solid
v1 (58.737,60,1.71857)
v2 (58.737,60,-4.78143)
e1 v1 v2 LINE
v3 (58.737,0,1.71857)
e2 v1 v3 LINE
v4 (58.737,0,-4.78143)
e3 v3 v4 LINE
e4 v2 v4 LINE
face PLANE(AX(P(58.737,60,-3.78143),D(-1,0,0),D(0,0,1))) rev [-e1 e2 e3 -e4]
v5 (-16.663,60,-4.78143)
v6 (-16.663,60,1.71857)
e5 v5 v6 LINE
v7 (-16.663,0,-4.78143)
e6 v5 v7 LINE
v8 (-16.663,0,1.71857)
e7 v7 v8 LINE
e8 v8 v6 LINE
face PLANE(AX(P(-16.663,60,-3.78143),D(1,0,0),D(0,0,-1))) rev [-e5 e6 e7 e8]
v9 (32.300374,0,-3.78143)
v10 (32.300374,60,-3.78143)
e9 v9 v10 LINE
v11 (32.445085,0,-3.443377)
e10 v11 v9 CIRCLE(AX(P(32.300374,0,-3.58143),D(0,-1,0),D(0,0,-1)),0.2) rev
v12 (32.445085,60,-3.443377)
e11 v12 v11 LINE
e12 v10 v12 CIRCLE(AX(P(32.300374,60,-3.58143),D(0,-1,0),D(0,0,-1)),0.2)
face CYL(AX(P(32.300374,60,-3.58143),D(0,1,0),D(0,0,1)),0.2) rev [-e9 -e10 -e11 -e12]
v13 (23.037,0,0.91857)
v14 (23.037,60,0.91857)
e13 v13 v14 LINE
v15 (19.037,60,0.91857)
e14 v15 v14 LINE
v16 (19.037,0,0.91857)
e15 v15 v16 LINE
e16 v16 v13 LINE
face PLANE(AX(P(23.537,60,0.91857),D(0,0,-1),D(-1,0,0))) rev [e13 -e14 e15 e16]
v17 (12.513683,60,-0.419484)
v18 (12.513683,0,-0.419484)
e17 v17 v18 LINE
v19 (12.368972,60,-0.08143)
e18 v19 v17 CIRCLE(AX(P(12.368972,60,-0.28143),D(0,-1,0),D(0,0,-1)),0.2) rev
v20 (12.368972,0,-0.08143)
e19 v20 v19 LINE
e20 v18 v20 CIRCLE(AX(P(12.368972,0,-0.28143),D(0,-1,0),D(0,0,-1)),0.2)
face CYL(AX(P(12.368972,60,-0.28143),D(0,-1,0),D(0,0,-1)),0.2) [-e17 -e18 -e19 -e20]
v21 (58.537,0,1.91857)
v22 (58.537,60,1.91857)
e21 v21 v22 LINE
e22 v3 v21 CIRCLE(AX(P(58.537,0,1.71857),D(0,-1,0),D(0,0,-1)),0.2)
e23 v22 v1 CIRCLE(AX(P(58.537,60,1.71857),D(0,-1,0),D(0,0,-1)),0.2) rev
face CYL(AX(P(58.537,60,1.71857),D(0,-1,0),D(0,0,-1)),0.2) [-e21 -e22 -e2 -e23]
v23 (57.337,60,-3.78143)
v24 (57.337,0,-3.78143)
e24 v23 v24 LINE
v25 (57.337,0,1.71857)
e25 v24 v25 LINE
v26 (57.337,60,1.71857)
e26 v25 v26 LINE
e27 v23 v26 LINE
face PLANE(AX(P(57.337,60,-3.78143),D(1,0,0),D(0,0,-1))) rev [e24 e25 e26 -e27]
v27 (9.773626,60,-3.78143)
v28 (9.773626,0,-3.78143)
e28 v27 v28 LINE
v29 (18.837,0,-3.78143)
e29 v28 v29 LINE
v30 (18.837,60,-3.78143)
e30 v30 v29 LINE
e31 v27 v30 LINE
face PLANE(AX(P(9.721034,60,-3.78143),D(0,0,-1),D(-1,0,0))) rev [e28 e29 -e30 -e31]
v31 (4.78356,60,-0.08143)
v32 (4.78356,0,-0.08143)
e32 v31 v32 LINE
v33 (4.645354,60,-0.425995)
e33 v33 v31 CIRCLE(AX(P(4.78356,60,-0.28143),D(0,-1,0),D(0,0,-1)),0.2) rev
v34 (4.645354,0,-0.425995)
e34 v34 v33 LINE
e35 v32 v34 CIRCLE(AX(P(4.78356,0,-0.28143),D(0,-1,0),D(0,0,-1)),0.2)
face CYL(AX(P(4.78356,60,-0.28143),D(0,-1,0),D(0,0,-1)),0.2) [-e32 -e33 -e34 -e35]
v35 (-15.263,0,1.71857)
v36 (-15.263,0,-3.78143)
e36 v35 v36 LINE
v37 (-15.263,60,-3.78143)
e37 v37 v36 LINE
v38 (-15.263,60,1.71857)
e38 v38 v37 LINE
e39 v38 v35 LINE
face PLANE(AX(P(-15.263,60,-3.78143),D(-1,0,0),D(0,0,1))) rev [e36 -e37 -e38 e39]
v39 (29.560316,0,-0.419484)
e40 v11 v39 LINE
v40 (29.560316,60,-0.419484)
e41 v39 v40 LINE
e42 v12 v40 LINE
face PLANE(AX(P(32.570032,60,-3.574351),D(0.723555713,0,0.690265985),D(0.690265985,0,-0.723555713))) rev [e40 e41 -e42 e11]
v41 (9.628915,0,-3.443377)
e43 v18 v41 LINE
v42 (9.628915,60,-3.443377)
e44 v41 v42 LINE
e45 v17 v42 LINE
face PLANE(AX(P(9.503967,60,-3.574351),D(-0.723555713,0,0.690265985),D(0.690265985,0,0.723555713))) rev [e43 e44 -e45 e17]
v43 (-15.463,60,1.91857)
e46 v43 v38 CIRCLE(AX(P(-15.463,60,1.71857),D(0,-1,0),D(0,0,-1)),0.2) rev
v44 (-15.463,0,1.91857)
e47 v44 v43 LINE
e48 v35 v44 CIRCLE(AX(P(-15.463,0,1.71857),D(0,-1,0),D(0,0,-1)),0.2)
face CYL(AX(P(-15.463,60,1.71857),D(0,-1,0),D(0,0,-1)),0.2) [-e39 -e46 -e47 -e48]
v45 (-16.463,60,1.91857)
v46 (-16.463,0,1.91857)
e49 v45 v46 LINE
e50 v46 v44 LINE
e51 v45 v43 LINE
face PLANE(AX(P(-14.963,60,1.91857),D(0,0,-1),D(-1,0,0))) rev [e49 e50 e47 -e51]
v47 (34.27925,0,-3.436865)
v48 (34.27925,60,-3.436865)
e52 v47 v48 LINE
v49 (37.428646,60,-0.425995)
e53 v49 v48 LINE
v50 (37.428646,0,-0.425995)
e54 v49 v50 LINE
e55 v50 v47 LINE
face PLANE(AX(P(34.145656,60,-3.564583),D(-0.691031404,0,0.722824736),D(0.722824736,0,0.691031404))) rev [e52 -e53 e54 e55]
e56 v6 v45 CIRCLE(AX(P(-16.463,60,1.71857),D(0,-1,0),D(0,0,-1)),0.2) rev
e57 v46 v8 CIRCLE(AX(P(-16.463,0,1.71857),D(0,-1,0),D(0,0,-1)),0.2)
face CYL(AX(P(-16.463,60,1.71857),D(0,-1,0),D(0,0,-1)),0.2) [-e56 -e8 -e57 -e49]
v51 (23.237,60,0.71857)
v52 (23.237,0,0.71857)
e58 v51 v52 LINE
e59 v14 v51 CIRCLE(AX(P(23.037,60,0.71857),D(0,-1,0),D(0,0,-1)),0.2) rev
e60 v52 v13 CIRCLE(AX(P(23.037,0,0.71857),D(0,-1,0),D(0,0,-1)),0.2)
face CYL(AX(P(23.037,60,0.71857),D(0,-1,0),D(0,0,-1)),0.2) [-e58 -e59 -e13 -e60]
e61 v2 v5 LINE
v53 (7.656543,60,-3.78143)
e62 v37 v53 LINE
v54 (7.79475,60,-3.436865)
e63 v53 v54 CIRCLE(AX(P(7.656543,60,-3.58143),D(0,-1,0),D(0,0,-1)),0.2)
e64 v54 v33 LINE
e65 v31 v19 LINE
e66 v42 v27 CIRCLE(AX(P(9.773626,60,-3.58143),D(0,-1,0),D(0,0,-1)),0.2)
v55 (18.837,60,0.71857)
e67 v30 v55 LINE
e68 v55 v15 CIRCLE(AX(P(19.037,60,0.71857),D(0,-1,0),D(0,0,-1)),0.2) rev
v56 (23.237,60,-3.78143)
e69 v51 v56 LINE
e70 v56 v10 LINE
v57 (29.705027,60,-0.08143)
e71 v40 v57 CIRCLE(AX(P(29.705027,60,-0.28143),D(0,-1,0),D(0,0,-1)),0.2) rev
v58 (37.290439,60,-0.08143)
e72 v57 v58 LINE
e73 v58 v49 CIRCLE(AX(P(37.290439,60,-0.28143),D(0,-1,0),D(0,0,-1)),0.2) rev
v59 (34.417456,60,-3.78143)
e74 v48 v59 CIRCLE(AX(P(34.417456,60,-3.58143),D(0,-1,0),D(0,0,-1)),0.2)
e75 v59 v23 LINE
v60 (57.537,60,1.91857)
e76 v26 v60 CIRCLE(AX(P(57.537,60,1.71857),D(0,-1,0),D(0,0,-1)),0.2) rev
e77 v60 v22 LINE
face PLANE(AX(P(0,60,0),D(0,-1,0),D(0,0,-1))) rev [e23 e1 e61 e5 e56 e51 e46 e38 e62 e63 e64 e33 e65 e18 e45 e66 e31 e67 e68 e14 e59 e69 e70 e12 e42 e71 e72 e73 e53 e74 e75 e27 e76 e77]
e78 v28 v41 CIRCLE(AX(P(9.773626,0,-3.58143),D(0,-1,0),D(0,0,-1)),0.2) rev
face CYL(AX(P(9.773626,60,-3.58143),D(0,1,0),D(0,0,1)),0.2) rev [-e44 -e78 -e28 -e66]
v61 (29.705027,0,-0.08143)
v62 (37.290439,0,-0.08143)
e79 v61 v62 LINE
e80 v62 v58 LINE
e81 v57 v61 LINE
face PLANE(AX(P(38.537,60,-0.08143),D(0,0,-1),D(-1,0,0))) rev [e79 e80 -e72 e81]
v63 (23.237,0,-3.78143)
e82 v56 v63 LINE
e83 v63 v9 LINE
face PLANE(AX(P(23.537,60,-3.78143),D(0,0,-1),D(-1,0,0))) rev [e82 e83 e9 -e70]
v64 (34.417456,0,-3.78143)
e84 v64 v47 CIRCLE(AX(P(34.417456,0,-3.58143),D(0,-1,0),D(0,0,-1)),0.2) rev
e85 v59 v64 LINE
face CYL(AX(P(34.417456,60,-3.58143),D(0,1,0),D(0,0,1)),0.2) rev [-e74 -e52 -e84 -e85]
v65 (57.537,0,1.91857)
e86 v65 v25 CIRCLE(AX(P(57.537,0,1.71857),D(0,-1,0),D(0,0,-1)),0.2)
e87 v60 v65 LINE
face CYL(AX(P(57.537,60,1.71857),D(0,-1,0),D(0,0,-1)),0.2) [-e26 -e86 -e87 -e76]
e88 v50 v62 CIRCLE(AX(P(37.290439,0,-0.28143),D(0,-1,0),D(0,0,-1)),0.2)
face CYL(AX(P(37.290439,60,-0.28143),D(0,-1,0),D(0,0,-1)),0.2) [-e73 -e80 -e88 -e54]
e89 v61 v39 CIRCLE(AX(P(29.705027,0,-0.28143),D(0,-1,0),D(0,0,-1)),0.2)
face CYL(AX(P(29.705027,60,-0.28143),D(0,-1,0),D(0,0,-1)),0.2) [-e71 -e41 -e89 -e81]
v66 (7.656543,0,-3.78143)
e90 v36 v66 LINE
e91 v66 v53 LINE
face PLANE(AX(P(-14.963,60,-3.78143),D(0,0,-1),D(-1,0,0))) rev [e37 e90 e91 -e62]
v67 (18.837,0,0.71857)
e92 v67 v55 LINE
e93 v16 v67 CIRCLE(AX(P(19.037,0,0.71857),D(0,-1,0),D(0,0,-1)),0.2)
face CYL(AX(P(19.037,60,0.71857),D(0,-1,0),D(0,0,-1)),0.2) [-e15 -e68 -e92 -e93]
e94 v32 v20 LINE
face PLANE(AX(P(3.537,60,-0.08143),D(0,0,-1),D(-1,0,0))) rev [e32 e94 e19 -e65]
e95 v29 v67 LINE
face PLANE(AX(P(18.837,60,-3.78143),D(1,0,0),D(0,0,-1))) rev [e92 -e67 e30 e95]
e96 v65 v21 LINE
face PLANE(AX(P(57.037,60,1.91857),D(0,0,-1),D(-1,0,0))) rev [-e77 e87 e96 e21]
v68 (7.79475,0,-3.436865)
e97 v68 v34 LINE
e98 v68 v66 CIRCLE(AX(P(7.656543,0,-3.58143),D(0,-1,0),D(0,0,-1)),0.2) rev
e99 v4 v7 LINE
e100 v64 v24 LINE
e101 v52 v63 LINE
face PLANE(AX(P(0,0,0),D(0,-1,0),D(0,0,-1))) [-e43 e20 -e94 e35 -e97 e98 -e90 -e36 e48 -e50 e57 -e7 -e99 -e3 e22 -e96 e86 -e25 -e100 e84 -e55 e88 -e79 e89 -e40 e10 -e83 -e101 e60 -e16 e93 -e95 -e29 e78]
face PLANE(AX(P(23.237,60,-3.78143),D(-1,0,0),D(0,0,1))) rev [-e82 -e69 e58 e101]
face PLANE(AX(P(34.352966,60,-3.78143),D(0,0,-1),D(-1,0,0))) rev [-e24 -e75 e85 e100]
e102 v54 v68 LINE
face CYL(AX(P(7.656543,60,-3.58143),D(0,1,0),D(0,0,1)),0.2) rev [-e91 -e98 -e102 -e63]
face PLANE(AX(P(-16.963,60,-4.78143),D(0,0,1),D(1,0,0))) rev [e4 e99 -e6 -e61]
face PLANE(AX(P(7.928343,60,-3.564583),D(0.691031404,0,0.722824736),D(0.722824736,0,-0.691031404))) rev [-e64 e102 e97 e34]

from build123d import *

# Parameters (mm, degrees)
BOSS_EXTRUDE1_DEPTH = 60
MOVE_FACE1_DEPTH    = 60
FILLET1_R           = 0.2


# Read off the part's stored shape, not the designer's step: Move Face1
with BuildPart() as part:
    # Sketch1 → Boss-Extrude1 (new body)
    with BuildSketch(Plane(origin=(0, 0, 0), x_dir=(1, 0, 0), z_dir=(0, 1, 0))):
        Polygon((7.721033882, 3.781430367), (3.536999802, -0.218569633), (13.536999802, -0.218569633), (9.721033882, 3.781430367), (18.536999802, 3.781430367), (18.536999802, -1.218569633), (23.536999802, -1.218569633), (23.536999802, 3.781430367), (32.352965722, 3.781430367), (28.536999802, -0.218569633), (38.536999802, -0.218569633), (34.352965722, 3.781430367), (57.036999802, 3.781430367), (57.036999802, -2.218569633), (59.036999802, -2.218569633), (59.036999802, 3.781430367), (59.036999802, 4.781430367), (-16.963000198, 4.781430367), (-16.963000198, 3.781430367), (-16.963000198, -2.218569633), (-14.963000198, -2.218569633), (-14.963000198, 3.781430367), align=None)
    extrude(amount=BOSS_EXTRUDE1_DEPTH)

    # Move Face1 outline → Move Face1 (cut)
    with BuildSketch(Plane(origin=(0, 0, 0), x_dir=(1, 0, 0), z_dir=(0, 1, 0))):
        Polygon((12.836183283, 0.081430367), (4.284936029, 0.081430367), (8.155167552, 3.781430367), (7.721033882, 3.781430367), (3.536999802, -0.218569633), (13.536999802, -0.218569633), (9.721033882, 3.781430367), (9.306414807, 3.781430367), align=None)
        Polygon((-14.963000198, -2.218569633), (-14.963000198, 3.781430367), (-15.263000198, 3.781430367), (-15.263000198, -1.918569633), (-16.663000198, -1.918569633), (-16.663000198, 4.781430367), (-16.963000198, 4.781430367), (-16.963000198, -2.218569633), align=None)
        Polygon((18.836999802, 3.781430367), (18.536999802, 3.781430367), (18.536999802, -1.218569633), (23.536999802, -1.218569633), (23.536999802, 3.781430367), (23.236999802, 3.781430367), (23.236999802, -0.918569633), (18.836999802, -0.918569633), align=None)
        Polygon((59.036999802, 4.781430367), (58.736999802, 4.781430367), (58.736999802, -1.918569633), (57.336999802, -1.918569633), (57.336999802, 3.781430367), (57.036999802, 3.781430367), (57.036999802, -2.218569633), (59.036999802, -2.218569633), align=None)
        Polygon((32.767584796, 3.781430367), (32.352965722, 3.781430367), (28.536999802, -0.218569633), (38.536999802, -0.218569633), (34.352965722, 3.781430367), (33.918832051, 3.781430367), (37.789063575, 0.081430367), (29.23781632, 0.081430367), align=None)
    extrude(amount=MOVE_FACE1_DEPTH, mode=Mode.SUBTRACT)

    # Fillet1
    fillet1_edges = [part.edges().sort_by_distance(p)[0] for p in [
        (-15.263000198, 30, 1.918569633),
        (-16.663000198, 30, 1.918569633),
        (58.736999802, 30, 1.918569633),
        (57.336999802, 30, 1.918569633),
        (33.918832051, 30, -3.781430367),
        (37.789063575, 30, -0.081430367),
        (29.23781632, 30, -0.081430367),
        (32.767584796, 30, -3.781430367),
        (23.236999802, 30, 0.918569633),
        (18.836999802, 30, 0.918569633),
        (9.306414807, 30, -3.781430367),
        (12.836183283, 30, -0.081430367),
        (4.284936029, 30, -0.081430367),
        (8.155167552, 30, -3.781430367),
    ]]
    fillet(fillet1_edges, radius=FILLET1_R)


solid = part.part
